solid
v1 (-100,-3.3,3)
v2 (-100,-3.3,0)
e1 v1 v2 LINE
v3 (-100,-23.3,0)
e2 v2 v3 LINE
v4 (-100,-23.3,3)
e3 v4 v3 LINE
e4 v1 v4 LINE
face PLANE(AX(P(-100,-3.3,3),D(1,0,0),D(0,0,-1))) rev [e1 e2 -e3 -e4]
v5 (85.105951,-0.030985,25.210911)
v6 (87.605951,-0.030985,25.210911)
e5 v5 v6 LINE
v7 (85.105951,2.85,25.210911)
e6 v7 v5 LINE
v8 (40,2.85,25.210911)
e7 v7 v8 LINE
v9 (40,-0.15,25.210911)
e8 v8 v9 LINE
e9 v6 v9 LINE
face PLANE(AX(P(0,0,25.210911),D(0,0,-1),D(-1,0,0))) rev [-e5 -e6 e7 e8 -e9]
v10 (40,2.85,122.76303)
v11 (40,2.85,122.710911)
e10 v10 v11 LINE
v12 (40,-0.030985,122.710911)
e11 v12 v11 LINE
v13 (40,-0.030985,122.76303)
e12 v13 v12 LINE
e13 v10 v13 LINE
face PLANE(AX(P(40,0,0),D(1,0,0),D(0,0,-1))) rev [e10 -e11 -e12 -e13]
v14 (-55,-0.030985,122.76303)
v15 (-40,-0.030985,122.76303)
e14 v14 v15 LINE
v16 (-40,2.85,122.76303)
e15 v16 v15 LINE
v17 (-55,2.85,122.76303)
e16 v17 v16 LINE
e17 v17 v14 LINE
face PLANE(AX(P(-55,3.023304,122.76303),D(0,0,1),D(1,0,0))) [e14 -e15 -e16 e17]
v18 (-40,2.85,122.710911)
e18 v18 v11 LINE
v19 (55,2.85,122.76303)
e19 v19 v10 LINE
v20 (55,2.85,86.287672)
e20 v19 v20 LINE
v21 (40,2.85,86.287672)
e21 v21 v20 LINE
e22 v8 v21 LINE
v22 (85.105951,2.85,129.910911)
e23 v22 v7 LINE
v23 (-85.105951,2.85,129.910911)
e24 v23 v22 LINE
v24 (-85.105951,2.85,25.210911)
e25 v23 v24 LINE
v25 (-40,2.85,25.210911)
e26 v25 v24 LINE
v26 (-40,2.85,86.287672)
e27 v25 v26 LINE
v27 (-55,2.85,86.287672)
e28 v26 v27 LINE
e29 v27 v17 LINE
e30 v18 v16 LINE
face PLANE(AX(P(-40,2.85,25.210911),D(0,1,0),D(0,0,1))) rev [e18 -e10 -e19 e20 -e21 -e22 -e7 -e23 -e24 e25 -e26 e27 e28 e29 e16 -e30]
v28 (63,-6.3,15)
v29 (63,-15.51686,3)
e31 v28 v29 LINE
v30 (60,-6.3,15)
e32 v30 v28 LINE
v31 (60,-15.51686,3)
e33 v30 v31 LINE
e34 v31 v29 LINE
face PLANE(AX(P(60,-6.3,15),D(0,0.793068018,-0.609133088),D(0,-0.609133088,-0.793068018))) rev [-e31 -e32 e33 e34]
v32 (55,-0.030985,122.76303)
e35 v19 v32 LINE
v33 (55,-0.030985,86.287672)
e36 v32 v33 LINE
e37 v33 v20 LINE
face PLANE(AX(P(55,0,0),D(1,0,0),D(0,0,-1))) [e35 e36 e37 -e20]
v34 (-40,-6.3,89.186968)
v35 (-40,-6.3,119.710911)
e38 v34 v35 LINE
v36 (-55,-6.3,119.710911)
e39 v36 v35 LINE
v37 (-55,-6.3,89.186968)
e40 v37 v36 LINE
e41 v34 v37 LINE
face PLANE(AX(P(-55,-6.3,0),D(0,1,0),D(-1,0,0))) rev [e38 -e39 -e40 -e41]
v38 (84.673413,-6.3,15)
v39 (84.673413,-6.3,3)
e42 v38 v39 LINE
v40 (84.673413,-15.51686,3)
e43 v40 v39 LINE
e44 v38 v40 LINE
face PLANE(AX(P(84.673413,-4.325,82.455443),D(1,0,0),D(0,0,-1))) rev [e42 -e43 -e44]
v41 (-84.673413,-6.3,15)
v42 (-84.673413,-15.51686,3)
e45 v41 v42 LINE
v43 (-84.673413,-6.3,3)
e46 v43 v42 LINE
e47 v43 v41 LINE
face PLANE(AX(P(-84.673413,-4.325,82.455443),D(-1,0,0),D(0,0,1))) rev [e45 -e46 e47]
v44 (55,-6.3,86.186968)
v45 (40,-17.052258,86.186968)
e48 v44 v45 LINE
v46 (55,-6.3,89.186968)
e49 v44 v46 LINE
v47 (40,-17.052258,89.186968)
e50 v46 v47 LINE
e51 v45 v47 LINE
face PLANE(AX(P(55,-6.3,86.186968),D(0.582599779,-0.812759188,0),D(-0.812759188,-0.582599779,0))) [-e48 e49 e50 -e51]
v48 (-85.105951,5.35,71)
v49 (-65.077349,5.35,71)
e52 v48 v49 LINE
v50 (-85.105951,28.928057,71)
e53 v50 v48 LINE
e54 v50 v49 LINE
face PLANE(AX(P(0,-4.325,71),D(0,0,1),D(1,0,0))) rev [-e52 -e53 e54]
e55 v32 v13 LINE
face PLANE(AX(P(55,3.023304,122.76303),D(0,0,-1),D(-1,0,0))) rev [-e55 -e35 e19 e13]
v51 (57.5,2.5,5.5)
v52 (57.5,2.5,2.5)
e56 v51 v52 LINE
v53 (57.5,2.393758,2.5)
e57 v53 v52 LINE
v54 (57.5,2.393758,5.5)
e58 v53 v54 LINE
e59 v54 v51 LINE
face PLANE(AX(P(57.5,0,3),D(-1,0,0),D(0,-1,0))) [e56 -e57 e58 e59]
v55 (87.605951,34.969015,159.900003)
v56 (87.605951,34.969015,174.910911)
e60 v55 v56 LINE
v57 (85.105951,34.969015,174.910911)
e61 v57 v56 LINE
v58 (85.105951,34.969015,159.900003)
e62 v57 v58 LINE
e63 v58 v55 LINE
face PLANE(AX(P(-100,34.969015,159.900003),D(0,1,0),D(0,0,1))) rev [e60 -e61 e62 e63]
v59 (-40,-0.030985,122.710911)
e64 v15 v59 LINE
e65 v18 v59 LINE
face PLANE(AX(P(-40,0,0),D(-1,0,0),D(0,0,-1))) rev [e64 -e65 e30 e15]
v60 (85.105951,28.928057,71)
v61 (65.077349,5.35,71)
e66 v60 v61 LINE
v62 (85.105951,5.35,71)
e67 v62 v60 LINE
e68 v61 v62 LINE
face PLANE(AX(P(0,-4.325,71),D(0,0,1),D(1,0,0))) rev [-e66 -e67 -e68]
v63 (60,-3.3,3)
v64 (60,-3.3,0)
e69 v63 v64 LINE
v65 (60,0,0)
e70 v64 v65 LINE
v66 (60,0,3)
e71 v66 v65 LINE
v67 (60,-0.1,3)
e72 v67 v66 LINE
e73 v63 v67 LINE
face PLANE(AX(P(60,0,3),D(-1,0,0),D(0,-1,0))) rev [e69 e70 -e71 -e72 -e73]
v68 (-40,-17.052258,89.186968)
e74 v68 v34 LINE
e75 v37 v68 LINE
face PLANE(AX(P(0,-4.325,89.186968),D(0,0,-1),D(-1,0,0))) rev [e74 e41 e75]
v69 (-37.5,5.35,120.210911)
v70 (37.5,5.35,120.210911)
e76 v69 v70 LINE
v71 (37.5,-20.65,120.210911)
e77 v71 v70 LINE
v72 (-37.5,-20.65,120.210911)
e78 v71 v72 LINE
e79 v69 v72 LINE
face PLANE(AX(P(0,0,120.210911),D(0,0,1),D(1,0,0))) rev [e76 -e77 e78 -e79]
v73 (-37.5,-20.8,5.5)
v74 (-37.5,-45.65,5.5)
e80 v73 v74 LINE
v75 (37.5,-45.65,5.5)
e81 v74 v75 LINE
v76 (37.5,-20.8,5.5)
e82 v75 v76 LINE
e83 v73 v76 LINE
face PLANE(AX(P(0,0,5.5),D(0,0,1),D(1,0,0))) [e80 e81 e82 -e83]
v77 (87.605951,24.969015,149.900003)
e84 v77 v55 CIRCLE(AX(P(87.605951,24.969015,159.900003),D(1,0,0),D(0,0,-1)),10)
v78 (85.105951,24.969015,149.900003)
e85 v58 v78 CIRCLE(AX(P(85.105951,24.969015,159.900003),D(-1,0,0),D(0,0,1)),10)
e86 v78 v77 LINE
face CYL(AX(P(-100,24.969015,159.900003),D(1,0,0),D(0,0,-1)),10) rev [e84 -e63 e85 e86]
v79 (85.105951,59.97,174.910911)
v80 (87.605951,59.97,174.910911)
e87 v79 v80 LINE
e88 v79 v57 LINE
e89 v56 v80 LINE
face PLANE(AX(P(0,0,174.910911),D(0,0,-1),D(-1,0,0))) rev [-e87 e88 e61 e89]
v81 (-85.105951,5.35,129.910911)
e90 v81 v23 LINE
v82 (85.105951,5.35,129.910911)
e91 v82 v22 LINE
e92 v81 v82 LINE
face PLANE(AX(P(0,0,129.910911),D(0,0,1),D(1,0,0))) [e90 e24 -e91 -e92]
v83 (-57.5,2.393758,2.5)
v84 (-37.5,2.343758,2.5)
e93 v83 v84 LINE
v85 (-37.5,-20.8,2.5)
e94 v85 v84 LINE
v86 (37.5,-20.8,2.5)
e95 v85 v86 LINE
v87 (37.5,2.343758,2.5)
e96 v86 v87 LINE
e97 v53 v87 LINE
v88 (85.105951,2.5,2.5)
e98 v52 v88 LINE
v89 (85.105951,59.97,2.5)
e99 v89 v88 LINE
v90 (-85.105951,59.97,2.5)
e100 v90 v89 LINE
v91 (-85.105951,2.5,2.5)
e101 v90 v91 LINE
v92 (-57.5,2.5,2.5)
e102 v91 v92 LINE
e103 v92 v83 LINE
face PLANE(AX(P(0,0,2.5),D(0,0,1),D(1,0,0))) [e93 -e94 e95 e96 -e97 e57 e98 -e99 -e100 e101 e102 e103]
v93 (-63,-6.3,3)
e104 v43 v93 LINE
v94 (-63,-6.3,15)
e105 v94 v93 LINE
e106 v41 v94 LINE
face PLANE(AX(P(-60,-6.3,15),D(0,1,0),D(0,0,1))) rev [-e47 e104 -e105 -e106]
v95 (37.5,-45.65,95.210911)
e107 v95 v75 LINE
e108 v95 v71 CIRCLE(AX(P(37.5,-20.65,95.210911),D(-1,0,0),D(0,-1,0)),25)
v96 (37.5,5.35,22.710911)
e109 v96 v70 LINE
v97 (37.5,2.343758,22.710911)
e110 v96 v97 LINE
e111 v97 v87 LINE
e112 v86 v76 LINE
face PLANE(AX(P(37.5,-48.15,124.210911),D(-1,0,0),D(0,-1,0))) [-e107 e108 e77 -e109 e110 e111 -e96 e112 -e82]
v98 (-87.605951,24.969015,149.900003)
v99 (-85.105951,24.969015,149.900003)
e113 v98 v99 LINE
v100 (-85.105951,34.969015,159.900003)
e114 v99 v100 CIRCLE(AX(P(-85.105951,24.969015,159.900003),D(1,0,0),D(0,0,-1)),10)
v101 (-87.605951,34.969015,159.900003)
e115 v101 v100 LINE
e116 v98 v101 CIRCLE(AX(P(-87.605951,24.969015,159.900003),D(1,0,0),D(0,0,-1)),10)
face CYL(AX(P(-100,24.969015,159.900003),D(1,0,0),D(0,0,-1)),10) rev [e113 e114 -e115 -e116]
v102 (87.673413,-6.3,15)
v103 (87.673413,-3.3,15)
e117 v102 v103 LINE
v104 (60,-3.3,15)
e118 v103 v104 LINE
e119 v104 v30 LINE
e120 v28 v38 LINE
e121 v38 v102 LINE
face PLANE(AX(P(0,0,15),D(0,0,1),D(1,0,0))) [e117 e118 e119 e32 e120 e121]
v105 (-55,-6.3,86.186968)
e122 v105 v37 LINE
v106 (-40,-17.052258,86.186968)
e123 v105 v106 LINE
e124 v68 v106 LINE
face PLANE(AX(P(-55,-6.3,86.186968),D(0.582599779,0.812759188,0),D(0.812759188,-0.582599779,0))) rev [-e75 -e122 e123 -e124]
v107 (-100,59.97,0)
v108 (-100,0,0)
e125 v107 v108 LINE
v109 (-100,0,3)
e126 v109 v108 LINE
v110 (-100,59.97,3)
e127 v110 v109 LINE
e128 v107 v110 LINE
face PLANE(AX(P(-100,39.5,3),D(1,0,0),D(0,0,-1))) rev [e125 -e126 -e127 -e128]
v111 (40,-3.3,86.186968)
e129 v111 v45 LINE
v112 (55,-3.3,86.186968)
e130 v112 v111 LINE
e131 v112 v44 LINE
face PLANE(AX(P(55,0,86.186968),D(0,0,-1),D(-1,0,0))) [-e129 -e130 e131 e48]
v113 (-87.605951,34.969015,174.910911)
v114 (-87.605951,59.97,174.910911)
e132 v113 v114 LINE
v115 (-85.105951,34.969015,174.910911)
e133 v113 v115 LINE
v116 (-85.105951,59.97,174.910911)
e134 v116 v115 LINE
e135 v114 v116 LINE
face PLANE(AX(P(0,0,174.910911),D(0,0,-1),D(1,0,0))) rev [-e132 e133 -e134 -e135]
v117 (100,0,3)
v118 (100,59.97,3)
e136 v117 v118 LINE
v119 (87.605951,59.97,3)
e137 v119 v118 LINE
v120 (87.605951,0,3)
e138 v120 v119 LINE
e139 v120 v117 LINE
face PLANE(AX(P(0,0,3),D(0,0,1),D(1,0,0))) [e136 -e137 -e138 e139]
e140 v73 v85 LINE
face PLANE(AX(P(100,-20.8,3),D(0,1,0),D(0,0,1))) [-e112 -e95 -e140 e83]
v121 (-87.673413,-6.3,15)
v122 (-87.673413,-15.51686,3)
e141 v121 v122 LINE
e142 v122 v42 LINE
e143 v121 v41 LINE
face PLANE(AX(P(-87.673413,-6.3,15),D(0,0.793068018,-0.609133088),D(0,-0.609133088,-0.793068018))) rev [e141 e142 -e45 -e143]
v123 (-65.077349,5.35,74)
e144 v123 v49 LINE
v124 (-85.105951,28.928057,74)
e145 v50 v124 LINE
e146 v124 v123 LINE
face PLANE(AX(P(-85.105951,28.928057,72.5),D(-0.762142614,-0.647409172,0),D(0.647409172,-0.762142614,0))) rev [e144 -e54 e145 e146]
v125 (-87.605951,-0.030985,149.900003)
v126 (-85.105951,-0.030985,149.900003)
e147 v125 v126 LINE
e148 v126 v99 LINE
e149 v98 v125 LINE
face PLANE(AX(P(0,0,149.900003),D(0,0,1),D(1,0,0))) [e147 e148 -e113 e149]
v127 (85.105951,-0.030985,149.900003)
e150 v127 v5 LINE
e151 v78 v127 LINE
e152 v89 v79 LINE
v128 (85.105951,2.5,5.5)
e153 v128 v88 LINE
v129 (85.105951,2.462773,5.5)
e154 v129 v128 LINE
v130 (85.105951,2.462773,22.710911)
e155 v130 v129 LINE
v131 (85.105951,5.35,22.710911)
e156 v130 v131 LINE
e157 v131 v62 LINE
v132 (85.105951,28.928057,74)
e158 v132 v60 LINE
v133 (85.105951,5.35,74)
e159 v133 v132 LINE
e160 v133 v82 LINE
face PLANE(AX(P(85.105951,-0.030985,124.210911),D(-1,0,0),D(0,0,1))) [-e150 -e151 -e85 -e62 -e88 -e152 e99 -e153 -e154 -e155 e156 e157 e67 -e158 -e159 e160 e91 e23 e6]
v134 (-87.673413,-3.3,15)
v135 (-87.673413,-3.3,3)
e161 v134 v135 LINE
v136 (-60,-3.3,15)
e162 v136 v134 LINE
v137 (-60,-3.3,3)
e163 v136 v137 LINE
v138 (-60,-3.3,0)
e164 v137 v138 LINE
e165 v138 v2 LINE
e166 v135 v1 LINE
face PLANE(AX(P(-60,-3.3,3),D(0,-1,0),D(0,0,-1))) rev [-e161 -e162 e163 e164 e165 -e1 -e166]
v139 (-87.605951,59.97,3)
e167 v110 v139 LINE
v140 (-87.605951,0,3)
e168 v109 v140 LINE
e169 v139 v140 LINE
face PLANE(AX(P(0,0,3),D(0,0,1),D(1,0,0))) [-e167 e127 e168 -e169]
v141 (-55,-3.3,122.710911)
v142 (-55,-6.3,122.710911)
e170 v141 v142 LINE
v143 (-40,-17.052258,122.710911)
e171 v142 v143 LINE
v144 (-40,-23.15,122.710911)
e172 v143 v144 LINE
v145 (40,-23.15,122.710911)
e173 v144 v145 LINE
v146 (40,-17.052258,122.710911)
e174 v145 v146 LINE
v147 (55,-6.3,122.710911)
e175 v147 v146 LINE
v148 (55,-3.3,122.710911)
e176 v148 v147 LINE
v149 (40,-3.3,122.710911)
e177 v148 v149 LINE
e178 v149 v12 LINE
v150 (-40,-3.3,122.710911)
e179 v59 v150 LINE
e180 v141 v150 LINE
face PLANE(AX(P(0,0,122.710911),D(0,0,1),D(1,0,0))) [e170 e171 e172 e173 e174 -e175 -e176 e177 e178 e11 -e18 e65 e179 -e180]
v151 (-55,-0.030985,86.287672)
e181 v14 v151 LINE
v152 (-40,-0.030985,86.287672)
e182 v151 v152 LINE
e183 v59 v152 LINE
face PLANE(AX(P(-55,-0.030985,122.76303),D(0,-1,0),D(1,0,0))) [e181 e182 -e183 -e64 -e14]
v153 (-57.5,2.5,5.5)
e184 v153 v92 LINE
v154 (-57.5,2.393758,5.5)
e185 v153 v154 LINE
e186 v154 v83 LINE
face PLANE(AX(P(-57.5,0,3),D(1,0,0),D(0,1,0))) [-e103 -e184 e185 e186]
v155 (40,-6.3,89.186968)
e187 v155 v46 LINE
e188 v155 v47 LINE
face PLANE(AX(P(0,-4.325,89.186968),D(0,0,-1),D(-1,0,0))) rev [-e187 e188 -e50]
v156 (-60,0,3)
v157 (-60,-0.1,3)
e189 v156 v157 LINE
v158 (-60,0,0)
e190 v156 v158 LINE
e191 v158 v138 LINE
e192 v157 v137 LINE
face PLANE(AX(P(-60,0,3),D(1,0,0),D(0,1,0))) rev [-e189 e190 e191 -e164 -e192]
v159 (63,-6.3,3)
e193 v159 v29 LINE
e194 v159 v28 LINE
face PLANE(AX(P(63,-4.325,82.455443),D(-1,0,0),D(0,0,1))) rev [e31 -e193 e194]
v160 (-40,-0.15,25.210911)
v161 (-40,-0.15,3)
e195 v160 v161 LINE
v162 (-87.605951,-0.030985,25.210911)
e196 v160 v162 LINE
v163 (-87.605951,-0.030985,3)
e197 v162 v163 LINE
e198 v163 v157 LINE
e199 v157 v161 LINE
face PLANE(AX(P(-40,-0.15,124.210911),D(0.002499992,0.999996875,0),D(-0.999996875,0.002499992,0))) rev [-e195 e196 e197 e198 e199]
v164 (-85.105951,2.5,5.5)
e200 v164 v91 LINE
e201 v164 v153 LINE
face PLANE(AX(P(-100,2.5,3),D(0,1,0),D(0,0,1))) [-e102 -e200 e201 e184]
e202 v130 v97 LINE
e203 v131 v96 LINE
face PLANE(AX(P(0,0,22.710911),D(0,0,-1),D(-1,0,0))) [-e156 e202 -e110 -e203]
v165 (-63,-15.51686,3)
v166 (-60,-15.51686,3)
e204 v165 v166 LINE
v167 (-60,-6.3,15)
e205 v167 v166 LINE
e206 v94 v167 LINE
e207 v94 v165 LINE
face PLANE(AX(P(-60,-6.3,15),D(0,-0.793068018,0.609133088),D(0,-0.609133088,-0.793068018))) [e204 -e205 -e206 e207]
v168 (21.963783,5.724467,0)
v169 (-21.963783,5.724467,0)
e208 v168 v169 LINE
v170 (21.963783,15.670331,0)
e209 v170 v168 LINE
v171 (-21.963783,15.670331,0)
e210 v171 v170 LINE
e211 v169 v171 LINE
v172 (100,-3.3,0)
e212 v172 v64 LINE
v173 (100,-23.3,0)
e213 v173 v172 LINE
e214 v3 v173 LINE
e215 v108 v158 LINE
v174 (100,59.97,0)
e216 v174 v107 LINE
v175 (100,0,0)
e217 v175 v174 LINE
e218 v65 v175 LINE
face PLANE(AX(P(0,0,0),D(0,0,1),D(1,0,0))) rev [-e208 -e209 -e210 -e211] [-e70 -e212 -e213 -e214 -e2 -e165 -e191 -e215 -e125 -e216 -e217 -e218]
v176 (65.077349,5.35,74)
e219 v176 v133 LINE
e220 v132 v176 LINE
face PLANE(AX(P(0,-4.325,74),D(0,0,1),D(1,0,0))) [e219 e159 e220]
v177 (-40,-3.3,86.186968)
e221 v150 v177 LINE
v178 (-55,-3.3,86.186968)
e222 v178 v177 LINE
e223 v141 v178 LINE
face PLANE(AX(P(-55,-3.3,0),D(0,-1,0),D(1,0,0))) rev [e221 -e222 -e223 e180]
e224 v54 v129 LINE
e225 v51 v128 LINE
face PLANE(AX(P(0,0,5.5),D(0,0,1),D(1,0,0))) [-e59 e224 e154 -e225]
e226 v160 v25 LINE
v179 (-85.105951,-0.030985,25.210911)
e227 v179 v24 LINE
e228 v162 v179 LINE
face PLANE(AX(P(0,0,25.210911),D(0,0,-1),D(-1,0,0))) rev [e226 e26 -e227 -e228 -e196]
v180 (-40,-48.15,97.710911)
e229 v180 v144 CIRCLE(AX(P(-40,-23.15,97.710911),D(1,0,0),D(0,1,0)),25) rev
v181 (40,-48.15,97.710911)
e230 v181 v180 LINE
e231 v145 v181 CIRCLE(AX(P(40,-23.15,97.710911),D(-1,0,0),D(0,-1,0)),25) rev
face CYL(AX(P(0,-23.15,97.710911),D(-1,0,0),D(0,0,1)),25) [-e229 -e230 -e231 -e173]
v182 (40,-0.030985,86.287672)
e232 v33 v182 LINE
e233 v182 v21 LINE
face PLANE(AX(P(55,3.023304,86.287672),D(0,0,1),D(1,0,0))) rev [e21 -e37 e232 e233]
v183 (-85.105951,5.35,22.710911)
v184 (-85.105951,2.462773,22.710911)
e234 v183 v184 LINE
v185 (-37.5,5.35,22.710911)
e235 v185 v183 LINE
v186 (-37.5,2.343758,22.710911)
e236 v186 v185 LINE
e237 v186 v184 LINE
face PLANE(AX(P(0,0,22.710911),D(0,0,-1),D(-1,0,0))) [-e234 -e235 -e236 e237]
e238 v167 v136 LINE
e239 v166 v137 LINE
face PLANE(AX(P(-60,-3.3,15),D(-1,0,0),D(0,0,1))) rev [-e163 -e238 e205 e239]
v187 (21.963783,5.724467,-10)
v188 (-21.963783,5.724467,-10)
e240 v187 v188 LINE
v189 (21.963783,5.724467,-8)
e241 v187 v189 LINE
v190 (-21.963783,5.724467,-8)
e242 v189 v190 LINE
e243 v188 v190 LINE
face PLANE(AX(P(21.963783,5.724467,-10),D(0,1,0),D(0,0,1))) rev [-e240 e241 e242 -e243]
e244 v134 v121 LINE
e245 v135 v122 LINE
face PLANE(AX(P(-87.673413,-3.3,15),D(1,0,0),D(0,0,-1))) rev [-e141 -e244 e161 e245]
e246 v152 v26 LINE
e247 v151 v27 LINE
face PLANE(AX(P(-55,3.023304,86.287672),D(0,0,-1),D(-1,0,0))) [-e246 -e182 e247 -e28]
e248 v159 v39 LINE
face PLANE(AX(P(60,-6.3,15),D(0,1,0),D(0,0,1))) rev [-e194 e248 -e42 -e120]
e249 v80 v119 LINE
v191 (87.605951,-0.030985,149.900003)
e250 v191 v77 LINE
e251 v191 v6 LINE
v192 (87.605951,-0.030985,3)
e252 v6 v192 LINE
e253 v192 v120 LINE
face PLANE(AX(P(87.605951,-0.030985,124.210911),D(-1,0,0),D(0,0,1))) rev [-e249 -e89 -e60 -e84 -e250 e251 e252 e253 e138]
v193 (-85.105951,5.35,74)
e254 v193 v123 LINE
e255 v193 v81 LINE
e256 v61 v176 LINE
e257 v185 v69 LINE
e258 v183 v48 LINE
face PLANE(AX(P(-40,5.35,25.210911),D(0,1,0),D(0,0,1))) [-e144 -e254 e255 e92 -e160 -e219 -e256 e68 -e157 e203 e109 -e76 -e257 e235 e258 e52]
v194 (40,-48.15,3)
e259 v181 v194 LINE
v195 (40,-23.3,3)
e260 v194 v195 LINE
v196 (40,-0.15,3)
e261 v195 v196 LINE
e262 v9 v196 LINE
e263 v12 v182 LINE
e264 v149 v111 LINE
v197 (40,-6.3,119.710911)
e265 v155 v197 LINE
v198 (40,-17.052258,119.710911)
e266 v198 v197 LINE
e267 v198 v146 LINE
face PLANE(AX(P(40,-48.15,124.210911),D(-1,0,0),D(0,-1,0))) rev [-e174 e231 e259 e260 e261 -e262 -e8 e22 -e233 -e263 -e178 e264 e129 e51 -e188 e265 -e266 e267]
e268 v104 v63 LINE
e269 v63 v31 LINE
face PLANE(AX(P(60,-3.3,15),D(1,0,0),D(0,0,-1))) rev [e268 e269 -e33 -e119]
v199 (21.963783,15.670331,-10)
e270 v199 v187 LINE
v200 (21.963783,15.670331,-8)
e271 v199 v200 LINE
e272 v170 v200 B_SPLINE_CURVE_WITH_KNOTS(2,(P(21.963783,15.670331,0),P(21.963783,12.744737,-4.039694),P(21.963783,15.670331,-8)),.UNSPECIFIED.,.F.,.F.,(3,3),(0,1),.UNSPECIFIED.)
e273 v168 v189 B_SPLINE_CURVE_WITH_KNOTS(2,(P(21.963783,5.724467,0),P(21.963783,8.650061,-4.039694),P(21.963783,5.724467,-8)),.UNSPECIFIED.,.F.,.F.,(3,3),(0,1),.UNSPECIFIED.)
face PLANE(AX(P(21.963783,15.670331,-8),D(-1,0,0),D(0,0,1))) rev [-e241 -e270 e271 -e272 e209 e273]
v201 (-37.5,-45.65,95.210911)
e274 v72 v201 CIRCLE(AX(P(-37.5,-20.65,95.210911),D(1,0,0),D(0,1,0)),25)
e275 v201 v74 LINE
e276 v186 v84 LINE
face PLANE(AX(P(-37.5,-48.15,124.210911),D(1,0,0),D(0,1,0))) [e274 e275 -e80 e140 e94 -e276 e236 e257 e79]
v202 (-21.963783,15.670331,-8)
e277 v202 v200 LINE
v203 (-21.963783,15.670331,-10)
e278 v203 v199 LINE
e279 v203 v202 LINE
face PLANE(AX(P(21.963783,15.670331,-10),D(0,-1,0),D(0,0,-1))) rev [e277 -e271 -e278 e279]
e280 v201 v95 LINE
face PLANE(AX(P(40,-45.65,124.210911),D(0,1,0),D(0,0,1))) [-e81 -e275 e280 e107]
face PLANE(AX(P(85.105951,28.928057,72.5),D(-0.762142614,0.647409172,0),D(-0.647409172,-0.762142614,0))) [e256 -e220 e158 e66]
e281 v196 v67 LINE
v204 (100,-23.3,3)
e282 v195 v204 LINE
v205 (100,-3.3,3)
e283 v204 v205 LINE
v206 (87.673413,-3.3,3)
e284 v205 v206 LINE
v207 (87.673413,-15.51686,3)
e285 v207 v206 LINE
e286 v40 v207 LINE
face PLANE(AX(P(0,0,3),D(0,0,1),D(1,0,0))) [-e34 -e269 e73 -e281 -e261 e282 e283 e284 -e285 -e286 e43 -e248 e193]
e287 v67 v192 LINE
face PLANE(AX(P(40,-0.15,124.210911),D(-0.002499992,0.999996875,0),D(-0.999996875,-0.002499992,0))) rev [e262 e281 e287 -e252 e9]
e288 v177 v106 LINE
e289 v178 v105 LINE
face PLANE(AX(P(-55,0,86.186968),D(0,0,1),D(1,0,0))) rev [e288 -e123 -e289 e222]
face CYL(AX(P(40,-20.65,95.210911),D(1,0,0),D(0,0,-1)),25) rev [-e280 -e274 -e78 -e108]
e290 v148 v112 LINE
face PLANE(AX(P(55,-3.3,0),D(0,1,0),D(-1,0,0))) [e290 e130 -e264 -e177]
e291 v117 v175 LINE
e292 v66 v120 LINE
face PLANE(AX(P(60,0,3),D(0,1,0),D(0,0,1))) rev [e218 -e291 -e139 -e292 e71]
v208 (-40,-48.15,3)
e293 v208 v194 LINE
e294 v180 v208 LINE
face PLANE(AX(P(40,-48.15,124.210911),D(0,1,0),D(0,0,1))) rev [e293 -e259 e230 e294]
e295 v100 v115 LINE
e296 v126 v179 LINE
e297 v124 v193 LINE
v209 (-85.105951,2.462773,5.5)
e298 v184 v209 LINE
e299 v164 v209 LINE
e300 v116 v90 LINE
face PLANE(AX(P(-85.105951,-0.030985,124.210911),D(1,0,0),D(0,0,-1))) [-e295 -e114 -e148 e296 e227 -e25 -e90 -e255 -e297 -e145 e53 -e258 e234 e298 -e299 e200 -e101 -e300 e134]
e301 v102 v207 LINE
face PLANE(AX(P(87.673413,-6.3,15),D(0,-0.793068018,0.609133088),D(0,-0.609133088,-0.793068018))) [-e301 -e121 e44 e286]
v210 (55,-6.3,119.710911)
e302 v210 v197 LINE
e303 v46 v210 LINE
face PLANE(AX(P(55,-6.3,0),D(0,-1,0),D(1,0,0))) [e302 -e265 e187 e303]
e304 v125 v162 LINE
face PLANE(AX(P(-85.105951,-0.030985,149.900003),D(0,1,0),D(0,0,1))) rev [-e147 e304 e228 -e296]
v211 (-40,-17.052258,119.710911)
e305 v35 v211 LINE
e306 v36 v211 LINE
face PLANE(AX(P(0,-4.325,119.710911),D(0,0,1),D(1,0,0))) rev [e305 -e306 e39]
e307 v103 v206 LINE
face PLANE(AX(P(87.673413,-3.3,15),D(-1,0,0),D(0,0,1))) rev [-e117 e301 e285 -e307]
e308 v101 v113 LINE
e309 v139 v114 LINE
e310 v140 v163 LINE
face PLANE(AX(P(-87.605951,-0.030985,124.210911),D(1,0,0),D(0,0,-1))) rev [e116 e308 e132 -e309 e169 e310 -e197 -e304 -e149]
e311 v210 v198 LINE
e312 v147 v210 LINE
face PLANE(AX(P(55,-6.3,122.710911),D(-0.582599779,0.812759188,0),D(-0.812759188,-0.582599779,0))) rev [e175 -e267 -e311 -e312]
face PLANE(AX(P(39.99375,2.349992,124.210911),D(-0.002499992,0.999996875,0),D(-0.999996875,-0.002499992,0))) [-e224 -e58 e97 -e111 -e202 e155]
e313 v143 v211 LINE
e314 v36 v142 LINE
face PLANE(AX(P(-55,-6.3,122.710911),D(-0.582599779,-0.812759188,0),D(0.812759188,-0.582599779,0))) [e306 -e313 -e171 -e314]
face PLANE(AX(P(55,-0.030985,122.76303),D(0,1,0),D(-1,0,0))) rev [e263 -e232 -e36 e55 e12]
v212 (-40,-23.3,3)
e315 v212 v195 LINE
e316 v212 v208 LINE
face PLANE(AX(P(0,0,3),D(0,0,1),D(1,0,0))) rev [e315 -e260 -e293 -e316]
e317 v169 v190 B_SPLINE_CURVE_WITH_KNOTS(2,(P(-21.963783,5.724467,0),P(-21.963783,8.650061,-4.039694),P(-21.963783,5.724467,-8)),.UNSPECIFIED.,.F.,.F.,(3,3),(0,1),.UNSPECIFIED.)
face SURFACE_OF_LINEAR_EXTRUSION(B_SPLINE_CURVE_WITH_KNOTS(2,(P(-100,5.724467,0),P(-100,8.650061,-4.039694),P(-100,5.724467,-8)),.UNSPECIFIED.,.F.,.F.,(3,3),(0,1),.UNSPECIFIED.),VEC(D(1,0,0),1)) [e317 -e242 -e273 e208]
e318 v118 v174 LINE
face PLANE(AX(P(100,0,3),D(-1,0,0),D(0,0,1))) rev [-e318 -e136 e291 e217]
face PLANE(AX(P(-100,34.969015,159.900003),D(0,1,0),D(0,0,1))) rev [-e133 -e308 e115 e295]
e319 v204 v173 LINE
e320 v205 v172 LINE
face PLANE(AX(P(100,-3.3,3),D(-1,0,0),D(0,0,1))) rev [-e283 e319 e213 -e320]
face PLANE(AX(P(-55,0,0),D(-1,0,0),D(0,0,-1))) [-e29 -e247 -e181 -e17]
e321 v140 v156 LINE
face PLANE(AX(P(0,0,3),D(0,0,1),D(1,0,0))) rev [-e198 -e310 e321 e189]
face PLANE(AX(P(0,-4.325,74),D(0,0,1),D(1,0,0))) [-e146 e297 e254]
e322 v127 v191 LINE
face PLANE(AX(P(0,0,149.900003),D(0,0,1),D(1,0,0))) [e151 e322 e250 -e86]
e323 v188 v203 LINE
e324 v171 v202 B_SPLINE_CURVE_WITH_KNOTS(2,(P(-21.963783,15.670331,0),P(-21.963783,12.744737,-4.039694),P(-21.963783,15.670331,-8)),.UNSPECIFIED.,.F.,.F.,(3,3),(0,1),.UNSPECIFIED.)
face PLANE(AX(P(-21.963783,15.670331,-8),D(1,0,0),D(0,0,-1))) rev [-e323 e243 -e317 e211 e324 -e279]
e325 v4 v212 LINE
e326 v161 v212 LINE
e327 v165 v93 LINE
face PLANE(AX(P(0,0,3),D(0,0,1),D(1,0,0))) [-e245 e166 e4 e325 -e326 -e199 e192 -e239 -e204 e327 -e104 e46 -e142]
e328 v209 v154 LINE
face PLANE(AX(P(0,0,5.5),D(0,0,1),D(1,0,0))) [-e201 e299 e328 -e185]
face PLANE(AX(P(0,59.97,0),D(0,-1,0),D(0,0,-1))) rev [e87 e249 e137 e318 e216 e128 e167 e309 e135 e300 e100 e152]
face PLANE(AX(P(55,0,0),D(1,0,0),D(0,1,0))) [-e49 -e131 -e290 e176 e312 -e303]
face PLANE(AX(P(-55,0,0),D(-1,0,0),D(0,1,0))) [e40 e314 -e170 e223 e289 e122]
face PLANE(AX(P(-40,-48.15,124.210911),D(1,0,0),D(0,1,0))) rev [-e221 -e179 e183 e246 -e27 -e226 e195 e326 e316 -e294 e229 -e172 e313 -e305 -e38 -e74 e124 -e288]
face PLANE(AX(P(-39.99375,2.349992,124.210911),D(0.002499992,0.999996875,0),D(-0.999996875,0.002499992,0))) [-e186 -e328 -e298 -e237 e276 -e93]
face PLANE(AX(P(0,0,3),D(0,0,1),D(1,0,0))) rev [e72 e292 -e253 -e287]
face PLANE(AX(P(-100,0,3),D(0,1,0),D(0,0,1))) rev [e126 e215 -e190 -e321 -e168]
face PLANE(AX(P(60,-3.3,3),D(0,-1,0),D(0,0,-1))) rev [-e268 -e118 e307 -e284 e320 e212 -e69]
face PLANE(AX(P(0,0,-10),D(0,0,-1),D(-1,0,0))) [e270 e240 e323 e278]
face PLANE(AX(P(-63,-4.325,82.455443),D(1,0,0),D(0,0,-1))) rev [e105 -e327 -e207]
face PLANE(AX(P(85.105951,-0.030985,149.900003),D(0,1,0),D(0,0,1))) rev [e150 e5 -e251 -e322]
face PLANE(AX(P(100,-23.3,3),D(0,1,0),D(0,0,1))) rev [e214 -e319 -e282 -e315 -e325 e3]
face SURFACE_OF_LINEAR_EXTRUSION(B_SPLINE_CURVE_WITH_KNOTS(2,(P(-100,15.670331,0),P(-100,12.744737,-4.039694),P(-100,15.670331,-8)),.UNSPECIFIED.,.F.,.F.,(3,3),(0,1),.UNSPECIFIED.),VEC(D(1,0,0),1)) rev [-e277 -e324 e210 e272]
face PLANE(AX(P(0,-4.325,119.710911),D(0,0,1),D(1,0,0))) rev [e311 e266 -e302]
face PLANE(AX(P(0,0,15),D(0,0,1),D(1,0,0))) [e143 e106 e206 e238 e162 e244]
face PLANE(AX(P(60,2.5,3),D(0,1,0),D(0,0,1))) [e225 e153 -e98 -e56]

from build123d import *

# Parameters (mm, degrees)
EXTRUDE_1_DEPTH          = 3
EXTRUDE_2_DEPTH          = 121.210911
SKETCH_3_W               = 47.605950515
SKETCH_3_H               = 3
CUT_EXTRUDE_1_DEPTH      = 99
SKETCH_5_W               = 185.441878516
SKETCH_5_H               = 108.742952173
CUT_EXTRUDE_2_DEPTH      = 1.5
SKETCH_6_W               = 175.21190103
SKETCH_6_H               = 36.65
EXTRUDE_3_DEPTH          = 7.2
SHELL_START              = 5.5
SHELL_1_DEPTH            = 114.710911355
SHELL_START_2            = 2.5
SHELL_1_2_OUTLINE_W      = 170.21190103
SHELL_1_2_OUTLINE_H      = 34.15
SHELL_1_2_DEPTH          = 124.910911355
SHELL_1_3_DEPTH          = 20.210911355
SHELL_1_4_DEPTH          = 17.210911355
SKETCH_7_W               = 170.21190103
SKETCH_7_H               = 34.15
CUT_EXTRUDE_3_DEPTH      = 7.2
SKETCH_8_W               = 2.5
SKETCH_8_H               = 36.65
EXTRUDE_4_DEPTH          = 45
CUT_EXTRUDE_4_DEPTH      = 261.975558395
SKETCH_10_W              = 2.5
SKETCH_10_H              = 2.880985124
EXTRUDE_5_DEPTH          = 124.689092
SKETCH_11_W              = 36.523943303
SKETCH_11_H              = 3
EXTRUDE_6_DEPTH          = 15
SKETCH_12_W              = 36.475357481
SKETCH_12_H              = 3.054288943
EXTRUDE_7_DEPTH          = 15
FILLET_1_R               = 25
SKETCH_13_W              = 43.927566906
SKETCH_13_H              = 9.945864205
EXTRUDE_8_DEPTH          = 8
CUT_EXTRUDE_5_DEPTH      = 219.603325421
SKETCH_15_W              = 43.927566906
SKETCH_15_H              = 9.945864205
EXTRUDE_9_DEPTH          = 2
SKETCH_17_W              = 27.673413216
SKETCH_17_H              = 3
EXTRUDE_10_DEPTH         = 12
RIB_1_REACH              = 263.024
SKETCH_18_WALL_W         = 539.179228978
SKETCH_18_WALL_H         = 3
MIRROR_5_COPY_1_REACH    = 263.024
MIRROR_5_COPY_1_SKETCH_W = 539.179228978
MIRROR_5_COPY_1_SKETCH_H = 3
RIB_2_REACH              = 175.005
SKETCH_19_WALL_W         = 366.464948776
SKETCH_19_WALL_H         = 3
MIRROR_7_COPY_1_REACH    = 175.005
MIRROR_7_COPY_1_SKETCH_W = 366.464948776
MIRROR_7_COPY_1_SKETCH_H = 3
RIB_3_REACH              = 153.018
SKETCH_20_WALL_W         = 334.972416452
SKETCH_20_WALL_H         = 3
EXTRUDE_11_DEPTH         = 20.47
CUT_EXTRUDE_6_DEPTH      = 264.412642976


# Read off the part's stored shape, not the designer's step: 抽壳1
with BuildPart() as part:
    # 草图1 → 凸台-拉伸1 (new body)
    with BuildSketch(Plane.XY):
        Polygon((-100, 0), (-60, 0), (-60, -3.3), (-100, -3.3), (-100, -23.3), (100, -23.3), (100, -3.3), (60, -3.3), (60, 0), (100, 0), (100, 39.5), (-100, 39.5), align=None)
    extrude(amount=EXTRUDE_1_DEPTH)

    # 草图2 → 凸台-拉伸2 (add)
    with BuildSketch(Plane.XY.offset(3)):
        Polygon((40, -48.15), (-40, -48.15), (-40, -0.15), (-87.605950515, -0.030985124), (-87.605950515, 39.5), (87.605950515, 39.5), (87.605950515, -0.030985124), (40, -0.15), align=None)
    extrude(amount=EXTRUDE_2_DEPTH)

    # 草图3 → 切除-拉伸1 (cut)
    with BuildSketch(Plane.XY.offset(124.210911355)):
        with Locations((63.802975258, 1.35)):
            Rectangle(SKETCH_3_W, SKETCH_3_H)
        with Locations((-63.802975258, 1.35)):
            Rectangle(SKETCH_3_W, SKETCH_3_H)
    extrude(amount=-CUT_EXTRUDE_1_DEPTH, mode=Mode.SUBTRACT)

    # 草图5 → 切除-拉伸2 (cut)
    with BuildSketch(Plane.XY.offset(124.210911355)):
        with Locations((-1.343781728, 1.77370169)):
            Rectangle(SKETCH_5_W, SKETCH_5_H)
    extrude(amount=-CUT_EXTRUDE_2_DEPTH, mode=Mode.SUBTRACT)

    # 草图6 → 凸台-拉伸3 (add)
    with BuildSketch(Plane.XY.offset(122.710911355)):
        with Locations((0, 21.175)):
            Rectangle(SKETCH_6_W, SKETCH_6_H)
    extrude(amount=EXTRUDE_3_DEPTH)

    # 抽壳1 outline → 抽壳1 (cut)
    with BuildSketch(Plane.XY.offset(SHELL_START)):
        Polygon((-85.105950515, 39.5), (-85.105950515, 5.35), (-37.5, 5.35), (-37.5, -45.65), (37.5, -45.65), (37.5, 5.35), (85.105950515, 5.35), (85.105950515, 39.5), align=None)
    extrude(amount=SHELL_1_DEPTH, mode=Mode.SUBTRACT)

    # Shell 1 2 outline → Shell 1 2 (cut)
    with BuildSketch(Plane.XY.offset(SHELL_START_2)):
        with Locations((0, 22.425)):
            Rectangle(SHELL_1_2_OUTLINE_W, SHELL_1_2_OUTLINE_H)
    extrude(amount=SHELL_1_2_DEPTH, mode=Mode.SUBTRACT)

    # Shell 1 3 outline → Shell 1 3 (cut)
    with BuildSketch(Plane.XY.offset(SHELL_START_2)):
        Polygon((-85.105950515, 5.35), (-85.105950515, 2.5), (-57.5, 2.5), (-57.5, 2.393757812), (-37.5, 2.343757812), (-37.5, -20.8), (37.5, -20.8), (37.5, 2.343757812), (57.5, 2.393757812), (57.5, 2.5), (85.105950515, 2.5), (85.105950515, 5.35), align=None)
    extrude(amount=SHELL_1_3_DEPTH, mode=Mode.SUBTRACT)

    # Shell 1 4 outline → Shell 1 4 (cut)
    with BuildSketch(Plane.XY.offset(SHELL_START)):
        Polygon((-85.105950515, 2.5), (-85.105950515, 2.462772689), (-57.5, 2.393757812), (-57.5, 2.5), align=None)
        Polygon((85.105950515, 2.462772689), (85.105950515, 2.5), (57.5, 2.5), (57.5, 2.393757812), align=None)
    extrude(amount=SHELL_1_4_DEPTH, mode=Mode.SUBTRACT)

    # 草图7 → 切除-拉伸3 (cut)
    with BuildSketch(Plane.XY.offset(129.910911355)):
        with Locations((0, 22.425)):
            Rectangle(SKETCH_7_W, SKETCH_7_H)
    extrude(amount=-CUT_EXTRUDE_3_DEPTH, mode=Mode.SUBTRACT)

    # 草图8 → 凸台-拉伸4 (add)
    with BuildSketch(Plane.XY.offset(129.910911355)):
        with Locations((86.355950515, 21.175)):
            Rectangle(SKETCH_8_W, SKETCH_8_H)
    extrude_4 = extrude(amount=EXTRUDE_4_DEPTH)

    # 镜向1: 凸台-拉伸4 across plane
    add(extrude_4.mirror(Plane(origin=(0, 0, 0), x_dir=(0, 0, 1), z_dir=(1, 0, 0))))

    # 草图9 → 切除-拉伸4 (cut, through all)
    with BuildSketch(Plane(origin=(87.605950515, 0, 0), x_dir=(0, 0, -1), z_dir=(1, 0, 0))):
        with BuildLine():
            ThreePointArc((-153.435169701, 14.152379613), (-157.269646082, 19.530454036), (-163.545332043, 21.590225708))
            Line((-163.545332043, 21.590225708), (-164.318099098, 21.561993734))
            Line((-164.318099098, 21.561993734), (-174.910911355, 21.175))
            Line((-174.910911355, 21.175), (-174.910911355, 2.85))
            Line((-174.910911355, 2.85), (-149.900003415, 2.85))
            Line((-149.900003415, 2.85), (-153.435169701, 14.152379613))
        make_face()
    extrude(amount=-CUT_EXTRUDE_4_DEPTH, mode=Mode.SUBTRACT)

    # 草图10 → 凸台-拉伸5 (add)
    with BuildSketch(Plane.XY.offset(25.210911355)):
        with Locations((86.355950515, 1.409507438)):
            Rectangle(SKETCH_10_W, SKETCH_10_H)
        with Locations((-86.355950515, 1.409507438)):
            Rectangle(SKETCH_10_W, SKETCH_10_H)
    extrude(amount=EXTRUDE_5_DEPTH)

    # 草图11 → 凸台-拉伸6 (add)
    with BuildSketch(Plane(origin=(40, 0, 0), x_dir=(0, 0, -1), z_dir=(1, 0, 0))):
        with Locations((-104.448939704, -4.8)):
            Rectangle(SKETCH_11_W, SKETCH_11_H)
    extrude_6 = extrude(amount=EXTRUDE_6_DEPTH)

    # 镜向2: 凸台-拉伸6 across plane
    add(extrude_6.mirror(Plane(origin=(0, 0, 0), x_dir=(0, 0, 1), z_dir=(1, 0, 0))))

    # 草图12 → 凸台-拉伸7 (add)
    with BuildSketch(Plane(origin=(40, 0, 0), x_dir=(0, 0, -1), z_dir=(1, 0, 0))):
        with Locations((-104.525351124, 1.496159348)):
            Rectangle(SKETCH_12_W, SKETCH_12_H)
    extrude_7 = extrude(amount=EXTRUDE_7_DEPTH)

    # 镜向3: 凸台-拉伸7 across plane
    add(extrude_7.mirror(Plane(origin=(0, 0, 0), x_dir=(0, 0, 1), z_dir=(1, 0, 0))))

    # 圆角1
    fillet_1_edges = [part.edges().sort_by_distance(p)[0] for p in [
        (0, -48.15, 122.710911355),
        (0, -45.65, 120.210911355),
    ]]
    fillet(fillet_1_edges, radius=FILLET_1_R)

    # 草图13 → 凸台-拉伸8 (add)
    with BuildSketch(Plane(origin=(0, 0, 0), x_dir=(-1, 0, 0), z_dir=(0, 0, -1))):
        with Locations((0, 10.69739906)):
            Rectangle(SKETCH_13_W, SKETCH_13_H)
    extrude(amount=EXTRUDE_8_DEPTH)

    # 草图14 → 切除-拉伸5 (cut, through all)
    with BuildSketch(Plane(origin=(21.963783453, 0, 0), x_dir=(0, 0, -1), z_dir=(1, 0, 0))):
        with BuildLine():
            add(Edge.make_bspline(
                [(0, 15.670331162), (4.03969355, 12.74473692), (8, 15.670331162)],
                knots=[0, 0, 0, 1, 1, 1], degree=2))
            Line((8, 15.670331162), (0, 15.670331162))
        make_face()
        with BuildLine():
            add(Edge.make_bspline(
                [(0, 5.724466957), (4.03969355, 8.650061199), (8, 5.724466957)],
                knots=[0, 0, 0, 1, 1, 1], degree=2))
            Line((8, 5.724466957), (0, 5.724466957))
        make_face()
    extrude(amount=-CUT_EXTRUDE_5_DEPTH, mode=Mode.SUBTRACT)

    # 草图15 → 凸台-拉伸9 (add)
    with BuildSketch(Plane(origin=(0, 0, -8), x_dir=(-1, 0, 0), z_dir=(0, 0, -1))):
        with Locations((0, 10.69739906)):
            Rectangle(SKETCH_15_W, SKETCH_15_H)
    extrude(amount=EXTRUDE_9_DEPTH)

    # 草图17 → 凸台-拉伸10 (add)
    with BuildSketch(Plane.XY.offset(3)):
        with Locations((73.836706608, -4.8)):
            Rectangle(SKETCH_17_W, SKETCH_17_H)
        with Locations((-73.836706608, -4.8)):
            Rectangle(SKETCH_17_W, SKETCH_17_H)
    extrude(amount=EXTRUDE_10_DEPTH)

    # 草图18 wall → 筋1 (add, up to next)
    with BuildSketch(Plane(origin=(87.673413216, -10.908430107, 9), x_dir=(0, -0.60913308834, -0.793068017694), z_dir=(0, 0.793068017694, -0.60913308834)), mode=Mode.PRIVATE) as rib_1_sk1:
        with Locations((0, 1.5)):
            Rectangle(SKETCH_18_WALL_W, SKETCH_18_WALL_H)
    rib_1_tool1 = extrude(rib_1_sk1.sketch, amount=RIB_1_REACH, mode=Mode.PRIVATE) - part.part
    rib_1 = rib_1_tool1.solids().sort_by_distance((87.673413216, -10.908430107, 9))[0]
    add(rib_1)

    # 镜向4: 筋1 across plane
    add(rib_1.mirror(Plane(origin=(73.836706608, 0, 0), x_dir=(0, 0, 1), z_dir=(1, 0, 0))))

    # 镜向5: 筋1 across plane
    add(rib_1.mirror(Plane(origin=(0, 0, 0), x_dir=(0, 0, 1), z_dir=(1, 0, 0))))

    # 镜向5 copy 1 sketch → 镜向5 copy 1 (add, up to next)
    with BuildSketch(Plane(origin=(-60, -10.908430107, 9), x_dir=(0, -0.60913308834, -0.793068017694), z_dir=(0, 0.793068017694, -0.60913308834)), mode=Mode.PRIVATE) as mirror_5_copy_1_sk1:
        with Locations((0, 1.5)):
            Rectangle(MIRROR_5_COPY_1_SKETCH_W, MIRROR_5_COPY_1_SKETCH_H)
    mirror_5_copy_1_tool1 = extrude(mirror_5_copy_1_sk1.sketch, amount=MIRROR_5_COPY_1_REACH, mode=Mode.PRIVATE) - part.part
    add(mirror_5_copy_1_tool1.solids().sort_by_distance((-60, -10.908430107, 9))[0])

    # 草图19 wall → 筋2 (add, up to next)
    with BuildSketch(Plane(origin=(47.5, -11.676129128, 122.710911355), x_dir=(-0.812759187769, -0.582599779176, 0), z_dir=(0.582599779176, -0.812759187769, 0)), mode=Mode.PRIVATE) as rib_2_sk1:
        with Locations((0, 1.5)):
            Rectangle(SKETCH_19_WALL_W, SKETCH_19_WALL_H)
    rib_2_tool1 = extrude(rib_2_sk1.sketch, amount=-RIB_2_REACH, mode=Mode.PRIVATE) - part.part
    rib_2 = rib_2_tool1.solids().sort_by_distance((47.5, -11.676129128, 122.710911355))[0]
    add(rib_2)

    # 镜向6: 筋2 across plane
    add(rib_2.mirror(Plane.XY.offset(104.448939704)))

    # 镜向7: 筋2 across plane
    add(rib_2.mirror(Plane(origin=(0, 0, 0), x_dir=(0, 0, 1), z_dir=(1, 0, 0))))

    # 镜向7 copy 1 sketch → 镜向7 copy 1 (add, up to next)
    with BuildSketch(Plane(origin=(-47.5, -11.676129128, 86.186968052), x_dir=(0.812759187769, -0.582599779176, 0), z_dir=(-0.582599779176, -0.812759187769, 0)), mode=Mode.PRIVATE) as mirror_7_copy_1_sk1:
        with Locations((0, 1.5)):
            Rectangle(MIRROR_7_COPY_1_SKETCH_W, MIRROR_7_COPY_1_SKETCH_H)
    mirror_7_copy_1_tool1 = extrude(mirror_7_copy_1_sk1.sketch, amount=-MIRROR_7_COPY_1_REACH, mode=Mode.PRIVATE) - part.part
    add(mirror_7_copy_1_tool1.solids().sort_by_distance((-47.5, -11.676129128, 86.186968052))[0])

    # 草图20 wall → 筋3 (add, up to next)
    with BuildSketch(Plane(origin=(75.091649782, 17.139028744, 72.5), x_dir=(-0.647409171989, -0.762142613967, 0), z_dir=(0.762142613967, -0.647409171989, 0)), mode=Mode.PRIVATE) as rib_3_sk1:
        Rectangle(SKETCH_20_WALL_W, SKETCH_20_WALL_H)
    rib_3_tool1 = extrude(rib_3_sk1.sketch, amount=RIB_3_REACH, mode=Mode.PRIVATE) - part.part
    rib_3 = rib_3_tool1.solids().sort_by_distance((75.091649782, 17.139028744, 72.5))[0]
    add(rib_3)

    # 镜向8: 筋3 across plane
    add(rib_3.mirror(Plane(origin=(0, 0, 0), x_dir=(0, 0, 1), z_dir=(1, 0, 0))))

    # 草图21 → 凸台-拉伸11 (add)
    with BuildSketch(Plane(origin=(0, 39.5, 0), x_dir=(1, 0, 0), z_dir=(0, 1, 0))):
        Polygon((-87.605950515, -174.910911355), (-85.105950515, -174.910911355), (-85.105950515, -2.5), (85.105950515, -2.5), (85.105950515, -174.910911355), (87.605950515, -174.910911355), (87.605950515, -3), (100, -3), (100, 0), (87.605950515, 0), (85.105950515, 0), (-85.105950515, 0), (-87.605950515, 0), (-100, 0), (-100, -3), (-87.605950515, -3), align=None)
    extrude(amount=EXTRUDE_11_DEPTH)

    # 草图22 → 切除-拉伸6 (cut, through all)
    with BuildSketch(Plane(origin=(87.605950515, 0, 0), x_dir=(0, 0, -1), z_dir=(1, 0, 0))):
        with BuildLine():
            Line((-149.900003415, -0.030985124), (-149.900003415, 24.969014876))
            ThreePointArc((-149.900003415, 24.969014876), (-152.828935603, 32.040082688), (-159.900003415, 34.969014876))
            Line((-159.900003415, 34.969014876), (-174.910911355, 34.969014876))
            Line((-174.910911355, 34.969014876), (-174.910911355, -0.030985124))
            Line((-174.910911355, -0.030985124), (-149.900003415, -0.030985124))
        make_face()
    extrude(amount=-CUT_EXTRUDE_6_DEPTH, mode=Mode.SUBTRACT)


solid = part.part
